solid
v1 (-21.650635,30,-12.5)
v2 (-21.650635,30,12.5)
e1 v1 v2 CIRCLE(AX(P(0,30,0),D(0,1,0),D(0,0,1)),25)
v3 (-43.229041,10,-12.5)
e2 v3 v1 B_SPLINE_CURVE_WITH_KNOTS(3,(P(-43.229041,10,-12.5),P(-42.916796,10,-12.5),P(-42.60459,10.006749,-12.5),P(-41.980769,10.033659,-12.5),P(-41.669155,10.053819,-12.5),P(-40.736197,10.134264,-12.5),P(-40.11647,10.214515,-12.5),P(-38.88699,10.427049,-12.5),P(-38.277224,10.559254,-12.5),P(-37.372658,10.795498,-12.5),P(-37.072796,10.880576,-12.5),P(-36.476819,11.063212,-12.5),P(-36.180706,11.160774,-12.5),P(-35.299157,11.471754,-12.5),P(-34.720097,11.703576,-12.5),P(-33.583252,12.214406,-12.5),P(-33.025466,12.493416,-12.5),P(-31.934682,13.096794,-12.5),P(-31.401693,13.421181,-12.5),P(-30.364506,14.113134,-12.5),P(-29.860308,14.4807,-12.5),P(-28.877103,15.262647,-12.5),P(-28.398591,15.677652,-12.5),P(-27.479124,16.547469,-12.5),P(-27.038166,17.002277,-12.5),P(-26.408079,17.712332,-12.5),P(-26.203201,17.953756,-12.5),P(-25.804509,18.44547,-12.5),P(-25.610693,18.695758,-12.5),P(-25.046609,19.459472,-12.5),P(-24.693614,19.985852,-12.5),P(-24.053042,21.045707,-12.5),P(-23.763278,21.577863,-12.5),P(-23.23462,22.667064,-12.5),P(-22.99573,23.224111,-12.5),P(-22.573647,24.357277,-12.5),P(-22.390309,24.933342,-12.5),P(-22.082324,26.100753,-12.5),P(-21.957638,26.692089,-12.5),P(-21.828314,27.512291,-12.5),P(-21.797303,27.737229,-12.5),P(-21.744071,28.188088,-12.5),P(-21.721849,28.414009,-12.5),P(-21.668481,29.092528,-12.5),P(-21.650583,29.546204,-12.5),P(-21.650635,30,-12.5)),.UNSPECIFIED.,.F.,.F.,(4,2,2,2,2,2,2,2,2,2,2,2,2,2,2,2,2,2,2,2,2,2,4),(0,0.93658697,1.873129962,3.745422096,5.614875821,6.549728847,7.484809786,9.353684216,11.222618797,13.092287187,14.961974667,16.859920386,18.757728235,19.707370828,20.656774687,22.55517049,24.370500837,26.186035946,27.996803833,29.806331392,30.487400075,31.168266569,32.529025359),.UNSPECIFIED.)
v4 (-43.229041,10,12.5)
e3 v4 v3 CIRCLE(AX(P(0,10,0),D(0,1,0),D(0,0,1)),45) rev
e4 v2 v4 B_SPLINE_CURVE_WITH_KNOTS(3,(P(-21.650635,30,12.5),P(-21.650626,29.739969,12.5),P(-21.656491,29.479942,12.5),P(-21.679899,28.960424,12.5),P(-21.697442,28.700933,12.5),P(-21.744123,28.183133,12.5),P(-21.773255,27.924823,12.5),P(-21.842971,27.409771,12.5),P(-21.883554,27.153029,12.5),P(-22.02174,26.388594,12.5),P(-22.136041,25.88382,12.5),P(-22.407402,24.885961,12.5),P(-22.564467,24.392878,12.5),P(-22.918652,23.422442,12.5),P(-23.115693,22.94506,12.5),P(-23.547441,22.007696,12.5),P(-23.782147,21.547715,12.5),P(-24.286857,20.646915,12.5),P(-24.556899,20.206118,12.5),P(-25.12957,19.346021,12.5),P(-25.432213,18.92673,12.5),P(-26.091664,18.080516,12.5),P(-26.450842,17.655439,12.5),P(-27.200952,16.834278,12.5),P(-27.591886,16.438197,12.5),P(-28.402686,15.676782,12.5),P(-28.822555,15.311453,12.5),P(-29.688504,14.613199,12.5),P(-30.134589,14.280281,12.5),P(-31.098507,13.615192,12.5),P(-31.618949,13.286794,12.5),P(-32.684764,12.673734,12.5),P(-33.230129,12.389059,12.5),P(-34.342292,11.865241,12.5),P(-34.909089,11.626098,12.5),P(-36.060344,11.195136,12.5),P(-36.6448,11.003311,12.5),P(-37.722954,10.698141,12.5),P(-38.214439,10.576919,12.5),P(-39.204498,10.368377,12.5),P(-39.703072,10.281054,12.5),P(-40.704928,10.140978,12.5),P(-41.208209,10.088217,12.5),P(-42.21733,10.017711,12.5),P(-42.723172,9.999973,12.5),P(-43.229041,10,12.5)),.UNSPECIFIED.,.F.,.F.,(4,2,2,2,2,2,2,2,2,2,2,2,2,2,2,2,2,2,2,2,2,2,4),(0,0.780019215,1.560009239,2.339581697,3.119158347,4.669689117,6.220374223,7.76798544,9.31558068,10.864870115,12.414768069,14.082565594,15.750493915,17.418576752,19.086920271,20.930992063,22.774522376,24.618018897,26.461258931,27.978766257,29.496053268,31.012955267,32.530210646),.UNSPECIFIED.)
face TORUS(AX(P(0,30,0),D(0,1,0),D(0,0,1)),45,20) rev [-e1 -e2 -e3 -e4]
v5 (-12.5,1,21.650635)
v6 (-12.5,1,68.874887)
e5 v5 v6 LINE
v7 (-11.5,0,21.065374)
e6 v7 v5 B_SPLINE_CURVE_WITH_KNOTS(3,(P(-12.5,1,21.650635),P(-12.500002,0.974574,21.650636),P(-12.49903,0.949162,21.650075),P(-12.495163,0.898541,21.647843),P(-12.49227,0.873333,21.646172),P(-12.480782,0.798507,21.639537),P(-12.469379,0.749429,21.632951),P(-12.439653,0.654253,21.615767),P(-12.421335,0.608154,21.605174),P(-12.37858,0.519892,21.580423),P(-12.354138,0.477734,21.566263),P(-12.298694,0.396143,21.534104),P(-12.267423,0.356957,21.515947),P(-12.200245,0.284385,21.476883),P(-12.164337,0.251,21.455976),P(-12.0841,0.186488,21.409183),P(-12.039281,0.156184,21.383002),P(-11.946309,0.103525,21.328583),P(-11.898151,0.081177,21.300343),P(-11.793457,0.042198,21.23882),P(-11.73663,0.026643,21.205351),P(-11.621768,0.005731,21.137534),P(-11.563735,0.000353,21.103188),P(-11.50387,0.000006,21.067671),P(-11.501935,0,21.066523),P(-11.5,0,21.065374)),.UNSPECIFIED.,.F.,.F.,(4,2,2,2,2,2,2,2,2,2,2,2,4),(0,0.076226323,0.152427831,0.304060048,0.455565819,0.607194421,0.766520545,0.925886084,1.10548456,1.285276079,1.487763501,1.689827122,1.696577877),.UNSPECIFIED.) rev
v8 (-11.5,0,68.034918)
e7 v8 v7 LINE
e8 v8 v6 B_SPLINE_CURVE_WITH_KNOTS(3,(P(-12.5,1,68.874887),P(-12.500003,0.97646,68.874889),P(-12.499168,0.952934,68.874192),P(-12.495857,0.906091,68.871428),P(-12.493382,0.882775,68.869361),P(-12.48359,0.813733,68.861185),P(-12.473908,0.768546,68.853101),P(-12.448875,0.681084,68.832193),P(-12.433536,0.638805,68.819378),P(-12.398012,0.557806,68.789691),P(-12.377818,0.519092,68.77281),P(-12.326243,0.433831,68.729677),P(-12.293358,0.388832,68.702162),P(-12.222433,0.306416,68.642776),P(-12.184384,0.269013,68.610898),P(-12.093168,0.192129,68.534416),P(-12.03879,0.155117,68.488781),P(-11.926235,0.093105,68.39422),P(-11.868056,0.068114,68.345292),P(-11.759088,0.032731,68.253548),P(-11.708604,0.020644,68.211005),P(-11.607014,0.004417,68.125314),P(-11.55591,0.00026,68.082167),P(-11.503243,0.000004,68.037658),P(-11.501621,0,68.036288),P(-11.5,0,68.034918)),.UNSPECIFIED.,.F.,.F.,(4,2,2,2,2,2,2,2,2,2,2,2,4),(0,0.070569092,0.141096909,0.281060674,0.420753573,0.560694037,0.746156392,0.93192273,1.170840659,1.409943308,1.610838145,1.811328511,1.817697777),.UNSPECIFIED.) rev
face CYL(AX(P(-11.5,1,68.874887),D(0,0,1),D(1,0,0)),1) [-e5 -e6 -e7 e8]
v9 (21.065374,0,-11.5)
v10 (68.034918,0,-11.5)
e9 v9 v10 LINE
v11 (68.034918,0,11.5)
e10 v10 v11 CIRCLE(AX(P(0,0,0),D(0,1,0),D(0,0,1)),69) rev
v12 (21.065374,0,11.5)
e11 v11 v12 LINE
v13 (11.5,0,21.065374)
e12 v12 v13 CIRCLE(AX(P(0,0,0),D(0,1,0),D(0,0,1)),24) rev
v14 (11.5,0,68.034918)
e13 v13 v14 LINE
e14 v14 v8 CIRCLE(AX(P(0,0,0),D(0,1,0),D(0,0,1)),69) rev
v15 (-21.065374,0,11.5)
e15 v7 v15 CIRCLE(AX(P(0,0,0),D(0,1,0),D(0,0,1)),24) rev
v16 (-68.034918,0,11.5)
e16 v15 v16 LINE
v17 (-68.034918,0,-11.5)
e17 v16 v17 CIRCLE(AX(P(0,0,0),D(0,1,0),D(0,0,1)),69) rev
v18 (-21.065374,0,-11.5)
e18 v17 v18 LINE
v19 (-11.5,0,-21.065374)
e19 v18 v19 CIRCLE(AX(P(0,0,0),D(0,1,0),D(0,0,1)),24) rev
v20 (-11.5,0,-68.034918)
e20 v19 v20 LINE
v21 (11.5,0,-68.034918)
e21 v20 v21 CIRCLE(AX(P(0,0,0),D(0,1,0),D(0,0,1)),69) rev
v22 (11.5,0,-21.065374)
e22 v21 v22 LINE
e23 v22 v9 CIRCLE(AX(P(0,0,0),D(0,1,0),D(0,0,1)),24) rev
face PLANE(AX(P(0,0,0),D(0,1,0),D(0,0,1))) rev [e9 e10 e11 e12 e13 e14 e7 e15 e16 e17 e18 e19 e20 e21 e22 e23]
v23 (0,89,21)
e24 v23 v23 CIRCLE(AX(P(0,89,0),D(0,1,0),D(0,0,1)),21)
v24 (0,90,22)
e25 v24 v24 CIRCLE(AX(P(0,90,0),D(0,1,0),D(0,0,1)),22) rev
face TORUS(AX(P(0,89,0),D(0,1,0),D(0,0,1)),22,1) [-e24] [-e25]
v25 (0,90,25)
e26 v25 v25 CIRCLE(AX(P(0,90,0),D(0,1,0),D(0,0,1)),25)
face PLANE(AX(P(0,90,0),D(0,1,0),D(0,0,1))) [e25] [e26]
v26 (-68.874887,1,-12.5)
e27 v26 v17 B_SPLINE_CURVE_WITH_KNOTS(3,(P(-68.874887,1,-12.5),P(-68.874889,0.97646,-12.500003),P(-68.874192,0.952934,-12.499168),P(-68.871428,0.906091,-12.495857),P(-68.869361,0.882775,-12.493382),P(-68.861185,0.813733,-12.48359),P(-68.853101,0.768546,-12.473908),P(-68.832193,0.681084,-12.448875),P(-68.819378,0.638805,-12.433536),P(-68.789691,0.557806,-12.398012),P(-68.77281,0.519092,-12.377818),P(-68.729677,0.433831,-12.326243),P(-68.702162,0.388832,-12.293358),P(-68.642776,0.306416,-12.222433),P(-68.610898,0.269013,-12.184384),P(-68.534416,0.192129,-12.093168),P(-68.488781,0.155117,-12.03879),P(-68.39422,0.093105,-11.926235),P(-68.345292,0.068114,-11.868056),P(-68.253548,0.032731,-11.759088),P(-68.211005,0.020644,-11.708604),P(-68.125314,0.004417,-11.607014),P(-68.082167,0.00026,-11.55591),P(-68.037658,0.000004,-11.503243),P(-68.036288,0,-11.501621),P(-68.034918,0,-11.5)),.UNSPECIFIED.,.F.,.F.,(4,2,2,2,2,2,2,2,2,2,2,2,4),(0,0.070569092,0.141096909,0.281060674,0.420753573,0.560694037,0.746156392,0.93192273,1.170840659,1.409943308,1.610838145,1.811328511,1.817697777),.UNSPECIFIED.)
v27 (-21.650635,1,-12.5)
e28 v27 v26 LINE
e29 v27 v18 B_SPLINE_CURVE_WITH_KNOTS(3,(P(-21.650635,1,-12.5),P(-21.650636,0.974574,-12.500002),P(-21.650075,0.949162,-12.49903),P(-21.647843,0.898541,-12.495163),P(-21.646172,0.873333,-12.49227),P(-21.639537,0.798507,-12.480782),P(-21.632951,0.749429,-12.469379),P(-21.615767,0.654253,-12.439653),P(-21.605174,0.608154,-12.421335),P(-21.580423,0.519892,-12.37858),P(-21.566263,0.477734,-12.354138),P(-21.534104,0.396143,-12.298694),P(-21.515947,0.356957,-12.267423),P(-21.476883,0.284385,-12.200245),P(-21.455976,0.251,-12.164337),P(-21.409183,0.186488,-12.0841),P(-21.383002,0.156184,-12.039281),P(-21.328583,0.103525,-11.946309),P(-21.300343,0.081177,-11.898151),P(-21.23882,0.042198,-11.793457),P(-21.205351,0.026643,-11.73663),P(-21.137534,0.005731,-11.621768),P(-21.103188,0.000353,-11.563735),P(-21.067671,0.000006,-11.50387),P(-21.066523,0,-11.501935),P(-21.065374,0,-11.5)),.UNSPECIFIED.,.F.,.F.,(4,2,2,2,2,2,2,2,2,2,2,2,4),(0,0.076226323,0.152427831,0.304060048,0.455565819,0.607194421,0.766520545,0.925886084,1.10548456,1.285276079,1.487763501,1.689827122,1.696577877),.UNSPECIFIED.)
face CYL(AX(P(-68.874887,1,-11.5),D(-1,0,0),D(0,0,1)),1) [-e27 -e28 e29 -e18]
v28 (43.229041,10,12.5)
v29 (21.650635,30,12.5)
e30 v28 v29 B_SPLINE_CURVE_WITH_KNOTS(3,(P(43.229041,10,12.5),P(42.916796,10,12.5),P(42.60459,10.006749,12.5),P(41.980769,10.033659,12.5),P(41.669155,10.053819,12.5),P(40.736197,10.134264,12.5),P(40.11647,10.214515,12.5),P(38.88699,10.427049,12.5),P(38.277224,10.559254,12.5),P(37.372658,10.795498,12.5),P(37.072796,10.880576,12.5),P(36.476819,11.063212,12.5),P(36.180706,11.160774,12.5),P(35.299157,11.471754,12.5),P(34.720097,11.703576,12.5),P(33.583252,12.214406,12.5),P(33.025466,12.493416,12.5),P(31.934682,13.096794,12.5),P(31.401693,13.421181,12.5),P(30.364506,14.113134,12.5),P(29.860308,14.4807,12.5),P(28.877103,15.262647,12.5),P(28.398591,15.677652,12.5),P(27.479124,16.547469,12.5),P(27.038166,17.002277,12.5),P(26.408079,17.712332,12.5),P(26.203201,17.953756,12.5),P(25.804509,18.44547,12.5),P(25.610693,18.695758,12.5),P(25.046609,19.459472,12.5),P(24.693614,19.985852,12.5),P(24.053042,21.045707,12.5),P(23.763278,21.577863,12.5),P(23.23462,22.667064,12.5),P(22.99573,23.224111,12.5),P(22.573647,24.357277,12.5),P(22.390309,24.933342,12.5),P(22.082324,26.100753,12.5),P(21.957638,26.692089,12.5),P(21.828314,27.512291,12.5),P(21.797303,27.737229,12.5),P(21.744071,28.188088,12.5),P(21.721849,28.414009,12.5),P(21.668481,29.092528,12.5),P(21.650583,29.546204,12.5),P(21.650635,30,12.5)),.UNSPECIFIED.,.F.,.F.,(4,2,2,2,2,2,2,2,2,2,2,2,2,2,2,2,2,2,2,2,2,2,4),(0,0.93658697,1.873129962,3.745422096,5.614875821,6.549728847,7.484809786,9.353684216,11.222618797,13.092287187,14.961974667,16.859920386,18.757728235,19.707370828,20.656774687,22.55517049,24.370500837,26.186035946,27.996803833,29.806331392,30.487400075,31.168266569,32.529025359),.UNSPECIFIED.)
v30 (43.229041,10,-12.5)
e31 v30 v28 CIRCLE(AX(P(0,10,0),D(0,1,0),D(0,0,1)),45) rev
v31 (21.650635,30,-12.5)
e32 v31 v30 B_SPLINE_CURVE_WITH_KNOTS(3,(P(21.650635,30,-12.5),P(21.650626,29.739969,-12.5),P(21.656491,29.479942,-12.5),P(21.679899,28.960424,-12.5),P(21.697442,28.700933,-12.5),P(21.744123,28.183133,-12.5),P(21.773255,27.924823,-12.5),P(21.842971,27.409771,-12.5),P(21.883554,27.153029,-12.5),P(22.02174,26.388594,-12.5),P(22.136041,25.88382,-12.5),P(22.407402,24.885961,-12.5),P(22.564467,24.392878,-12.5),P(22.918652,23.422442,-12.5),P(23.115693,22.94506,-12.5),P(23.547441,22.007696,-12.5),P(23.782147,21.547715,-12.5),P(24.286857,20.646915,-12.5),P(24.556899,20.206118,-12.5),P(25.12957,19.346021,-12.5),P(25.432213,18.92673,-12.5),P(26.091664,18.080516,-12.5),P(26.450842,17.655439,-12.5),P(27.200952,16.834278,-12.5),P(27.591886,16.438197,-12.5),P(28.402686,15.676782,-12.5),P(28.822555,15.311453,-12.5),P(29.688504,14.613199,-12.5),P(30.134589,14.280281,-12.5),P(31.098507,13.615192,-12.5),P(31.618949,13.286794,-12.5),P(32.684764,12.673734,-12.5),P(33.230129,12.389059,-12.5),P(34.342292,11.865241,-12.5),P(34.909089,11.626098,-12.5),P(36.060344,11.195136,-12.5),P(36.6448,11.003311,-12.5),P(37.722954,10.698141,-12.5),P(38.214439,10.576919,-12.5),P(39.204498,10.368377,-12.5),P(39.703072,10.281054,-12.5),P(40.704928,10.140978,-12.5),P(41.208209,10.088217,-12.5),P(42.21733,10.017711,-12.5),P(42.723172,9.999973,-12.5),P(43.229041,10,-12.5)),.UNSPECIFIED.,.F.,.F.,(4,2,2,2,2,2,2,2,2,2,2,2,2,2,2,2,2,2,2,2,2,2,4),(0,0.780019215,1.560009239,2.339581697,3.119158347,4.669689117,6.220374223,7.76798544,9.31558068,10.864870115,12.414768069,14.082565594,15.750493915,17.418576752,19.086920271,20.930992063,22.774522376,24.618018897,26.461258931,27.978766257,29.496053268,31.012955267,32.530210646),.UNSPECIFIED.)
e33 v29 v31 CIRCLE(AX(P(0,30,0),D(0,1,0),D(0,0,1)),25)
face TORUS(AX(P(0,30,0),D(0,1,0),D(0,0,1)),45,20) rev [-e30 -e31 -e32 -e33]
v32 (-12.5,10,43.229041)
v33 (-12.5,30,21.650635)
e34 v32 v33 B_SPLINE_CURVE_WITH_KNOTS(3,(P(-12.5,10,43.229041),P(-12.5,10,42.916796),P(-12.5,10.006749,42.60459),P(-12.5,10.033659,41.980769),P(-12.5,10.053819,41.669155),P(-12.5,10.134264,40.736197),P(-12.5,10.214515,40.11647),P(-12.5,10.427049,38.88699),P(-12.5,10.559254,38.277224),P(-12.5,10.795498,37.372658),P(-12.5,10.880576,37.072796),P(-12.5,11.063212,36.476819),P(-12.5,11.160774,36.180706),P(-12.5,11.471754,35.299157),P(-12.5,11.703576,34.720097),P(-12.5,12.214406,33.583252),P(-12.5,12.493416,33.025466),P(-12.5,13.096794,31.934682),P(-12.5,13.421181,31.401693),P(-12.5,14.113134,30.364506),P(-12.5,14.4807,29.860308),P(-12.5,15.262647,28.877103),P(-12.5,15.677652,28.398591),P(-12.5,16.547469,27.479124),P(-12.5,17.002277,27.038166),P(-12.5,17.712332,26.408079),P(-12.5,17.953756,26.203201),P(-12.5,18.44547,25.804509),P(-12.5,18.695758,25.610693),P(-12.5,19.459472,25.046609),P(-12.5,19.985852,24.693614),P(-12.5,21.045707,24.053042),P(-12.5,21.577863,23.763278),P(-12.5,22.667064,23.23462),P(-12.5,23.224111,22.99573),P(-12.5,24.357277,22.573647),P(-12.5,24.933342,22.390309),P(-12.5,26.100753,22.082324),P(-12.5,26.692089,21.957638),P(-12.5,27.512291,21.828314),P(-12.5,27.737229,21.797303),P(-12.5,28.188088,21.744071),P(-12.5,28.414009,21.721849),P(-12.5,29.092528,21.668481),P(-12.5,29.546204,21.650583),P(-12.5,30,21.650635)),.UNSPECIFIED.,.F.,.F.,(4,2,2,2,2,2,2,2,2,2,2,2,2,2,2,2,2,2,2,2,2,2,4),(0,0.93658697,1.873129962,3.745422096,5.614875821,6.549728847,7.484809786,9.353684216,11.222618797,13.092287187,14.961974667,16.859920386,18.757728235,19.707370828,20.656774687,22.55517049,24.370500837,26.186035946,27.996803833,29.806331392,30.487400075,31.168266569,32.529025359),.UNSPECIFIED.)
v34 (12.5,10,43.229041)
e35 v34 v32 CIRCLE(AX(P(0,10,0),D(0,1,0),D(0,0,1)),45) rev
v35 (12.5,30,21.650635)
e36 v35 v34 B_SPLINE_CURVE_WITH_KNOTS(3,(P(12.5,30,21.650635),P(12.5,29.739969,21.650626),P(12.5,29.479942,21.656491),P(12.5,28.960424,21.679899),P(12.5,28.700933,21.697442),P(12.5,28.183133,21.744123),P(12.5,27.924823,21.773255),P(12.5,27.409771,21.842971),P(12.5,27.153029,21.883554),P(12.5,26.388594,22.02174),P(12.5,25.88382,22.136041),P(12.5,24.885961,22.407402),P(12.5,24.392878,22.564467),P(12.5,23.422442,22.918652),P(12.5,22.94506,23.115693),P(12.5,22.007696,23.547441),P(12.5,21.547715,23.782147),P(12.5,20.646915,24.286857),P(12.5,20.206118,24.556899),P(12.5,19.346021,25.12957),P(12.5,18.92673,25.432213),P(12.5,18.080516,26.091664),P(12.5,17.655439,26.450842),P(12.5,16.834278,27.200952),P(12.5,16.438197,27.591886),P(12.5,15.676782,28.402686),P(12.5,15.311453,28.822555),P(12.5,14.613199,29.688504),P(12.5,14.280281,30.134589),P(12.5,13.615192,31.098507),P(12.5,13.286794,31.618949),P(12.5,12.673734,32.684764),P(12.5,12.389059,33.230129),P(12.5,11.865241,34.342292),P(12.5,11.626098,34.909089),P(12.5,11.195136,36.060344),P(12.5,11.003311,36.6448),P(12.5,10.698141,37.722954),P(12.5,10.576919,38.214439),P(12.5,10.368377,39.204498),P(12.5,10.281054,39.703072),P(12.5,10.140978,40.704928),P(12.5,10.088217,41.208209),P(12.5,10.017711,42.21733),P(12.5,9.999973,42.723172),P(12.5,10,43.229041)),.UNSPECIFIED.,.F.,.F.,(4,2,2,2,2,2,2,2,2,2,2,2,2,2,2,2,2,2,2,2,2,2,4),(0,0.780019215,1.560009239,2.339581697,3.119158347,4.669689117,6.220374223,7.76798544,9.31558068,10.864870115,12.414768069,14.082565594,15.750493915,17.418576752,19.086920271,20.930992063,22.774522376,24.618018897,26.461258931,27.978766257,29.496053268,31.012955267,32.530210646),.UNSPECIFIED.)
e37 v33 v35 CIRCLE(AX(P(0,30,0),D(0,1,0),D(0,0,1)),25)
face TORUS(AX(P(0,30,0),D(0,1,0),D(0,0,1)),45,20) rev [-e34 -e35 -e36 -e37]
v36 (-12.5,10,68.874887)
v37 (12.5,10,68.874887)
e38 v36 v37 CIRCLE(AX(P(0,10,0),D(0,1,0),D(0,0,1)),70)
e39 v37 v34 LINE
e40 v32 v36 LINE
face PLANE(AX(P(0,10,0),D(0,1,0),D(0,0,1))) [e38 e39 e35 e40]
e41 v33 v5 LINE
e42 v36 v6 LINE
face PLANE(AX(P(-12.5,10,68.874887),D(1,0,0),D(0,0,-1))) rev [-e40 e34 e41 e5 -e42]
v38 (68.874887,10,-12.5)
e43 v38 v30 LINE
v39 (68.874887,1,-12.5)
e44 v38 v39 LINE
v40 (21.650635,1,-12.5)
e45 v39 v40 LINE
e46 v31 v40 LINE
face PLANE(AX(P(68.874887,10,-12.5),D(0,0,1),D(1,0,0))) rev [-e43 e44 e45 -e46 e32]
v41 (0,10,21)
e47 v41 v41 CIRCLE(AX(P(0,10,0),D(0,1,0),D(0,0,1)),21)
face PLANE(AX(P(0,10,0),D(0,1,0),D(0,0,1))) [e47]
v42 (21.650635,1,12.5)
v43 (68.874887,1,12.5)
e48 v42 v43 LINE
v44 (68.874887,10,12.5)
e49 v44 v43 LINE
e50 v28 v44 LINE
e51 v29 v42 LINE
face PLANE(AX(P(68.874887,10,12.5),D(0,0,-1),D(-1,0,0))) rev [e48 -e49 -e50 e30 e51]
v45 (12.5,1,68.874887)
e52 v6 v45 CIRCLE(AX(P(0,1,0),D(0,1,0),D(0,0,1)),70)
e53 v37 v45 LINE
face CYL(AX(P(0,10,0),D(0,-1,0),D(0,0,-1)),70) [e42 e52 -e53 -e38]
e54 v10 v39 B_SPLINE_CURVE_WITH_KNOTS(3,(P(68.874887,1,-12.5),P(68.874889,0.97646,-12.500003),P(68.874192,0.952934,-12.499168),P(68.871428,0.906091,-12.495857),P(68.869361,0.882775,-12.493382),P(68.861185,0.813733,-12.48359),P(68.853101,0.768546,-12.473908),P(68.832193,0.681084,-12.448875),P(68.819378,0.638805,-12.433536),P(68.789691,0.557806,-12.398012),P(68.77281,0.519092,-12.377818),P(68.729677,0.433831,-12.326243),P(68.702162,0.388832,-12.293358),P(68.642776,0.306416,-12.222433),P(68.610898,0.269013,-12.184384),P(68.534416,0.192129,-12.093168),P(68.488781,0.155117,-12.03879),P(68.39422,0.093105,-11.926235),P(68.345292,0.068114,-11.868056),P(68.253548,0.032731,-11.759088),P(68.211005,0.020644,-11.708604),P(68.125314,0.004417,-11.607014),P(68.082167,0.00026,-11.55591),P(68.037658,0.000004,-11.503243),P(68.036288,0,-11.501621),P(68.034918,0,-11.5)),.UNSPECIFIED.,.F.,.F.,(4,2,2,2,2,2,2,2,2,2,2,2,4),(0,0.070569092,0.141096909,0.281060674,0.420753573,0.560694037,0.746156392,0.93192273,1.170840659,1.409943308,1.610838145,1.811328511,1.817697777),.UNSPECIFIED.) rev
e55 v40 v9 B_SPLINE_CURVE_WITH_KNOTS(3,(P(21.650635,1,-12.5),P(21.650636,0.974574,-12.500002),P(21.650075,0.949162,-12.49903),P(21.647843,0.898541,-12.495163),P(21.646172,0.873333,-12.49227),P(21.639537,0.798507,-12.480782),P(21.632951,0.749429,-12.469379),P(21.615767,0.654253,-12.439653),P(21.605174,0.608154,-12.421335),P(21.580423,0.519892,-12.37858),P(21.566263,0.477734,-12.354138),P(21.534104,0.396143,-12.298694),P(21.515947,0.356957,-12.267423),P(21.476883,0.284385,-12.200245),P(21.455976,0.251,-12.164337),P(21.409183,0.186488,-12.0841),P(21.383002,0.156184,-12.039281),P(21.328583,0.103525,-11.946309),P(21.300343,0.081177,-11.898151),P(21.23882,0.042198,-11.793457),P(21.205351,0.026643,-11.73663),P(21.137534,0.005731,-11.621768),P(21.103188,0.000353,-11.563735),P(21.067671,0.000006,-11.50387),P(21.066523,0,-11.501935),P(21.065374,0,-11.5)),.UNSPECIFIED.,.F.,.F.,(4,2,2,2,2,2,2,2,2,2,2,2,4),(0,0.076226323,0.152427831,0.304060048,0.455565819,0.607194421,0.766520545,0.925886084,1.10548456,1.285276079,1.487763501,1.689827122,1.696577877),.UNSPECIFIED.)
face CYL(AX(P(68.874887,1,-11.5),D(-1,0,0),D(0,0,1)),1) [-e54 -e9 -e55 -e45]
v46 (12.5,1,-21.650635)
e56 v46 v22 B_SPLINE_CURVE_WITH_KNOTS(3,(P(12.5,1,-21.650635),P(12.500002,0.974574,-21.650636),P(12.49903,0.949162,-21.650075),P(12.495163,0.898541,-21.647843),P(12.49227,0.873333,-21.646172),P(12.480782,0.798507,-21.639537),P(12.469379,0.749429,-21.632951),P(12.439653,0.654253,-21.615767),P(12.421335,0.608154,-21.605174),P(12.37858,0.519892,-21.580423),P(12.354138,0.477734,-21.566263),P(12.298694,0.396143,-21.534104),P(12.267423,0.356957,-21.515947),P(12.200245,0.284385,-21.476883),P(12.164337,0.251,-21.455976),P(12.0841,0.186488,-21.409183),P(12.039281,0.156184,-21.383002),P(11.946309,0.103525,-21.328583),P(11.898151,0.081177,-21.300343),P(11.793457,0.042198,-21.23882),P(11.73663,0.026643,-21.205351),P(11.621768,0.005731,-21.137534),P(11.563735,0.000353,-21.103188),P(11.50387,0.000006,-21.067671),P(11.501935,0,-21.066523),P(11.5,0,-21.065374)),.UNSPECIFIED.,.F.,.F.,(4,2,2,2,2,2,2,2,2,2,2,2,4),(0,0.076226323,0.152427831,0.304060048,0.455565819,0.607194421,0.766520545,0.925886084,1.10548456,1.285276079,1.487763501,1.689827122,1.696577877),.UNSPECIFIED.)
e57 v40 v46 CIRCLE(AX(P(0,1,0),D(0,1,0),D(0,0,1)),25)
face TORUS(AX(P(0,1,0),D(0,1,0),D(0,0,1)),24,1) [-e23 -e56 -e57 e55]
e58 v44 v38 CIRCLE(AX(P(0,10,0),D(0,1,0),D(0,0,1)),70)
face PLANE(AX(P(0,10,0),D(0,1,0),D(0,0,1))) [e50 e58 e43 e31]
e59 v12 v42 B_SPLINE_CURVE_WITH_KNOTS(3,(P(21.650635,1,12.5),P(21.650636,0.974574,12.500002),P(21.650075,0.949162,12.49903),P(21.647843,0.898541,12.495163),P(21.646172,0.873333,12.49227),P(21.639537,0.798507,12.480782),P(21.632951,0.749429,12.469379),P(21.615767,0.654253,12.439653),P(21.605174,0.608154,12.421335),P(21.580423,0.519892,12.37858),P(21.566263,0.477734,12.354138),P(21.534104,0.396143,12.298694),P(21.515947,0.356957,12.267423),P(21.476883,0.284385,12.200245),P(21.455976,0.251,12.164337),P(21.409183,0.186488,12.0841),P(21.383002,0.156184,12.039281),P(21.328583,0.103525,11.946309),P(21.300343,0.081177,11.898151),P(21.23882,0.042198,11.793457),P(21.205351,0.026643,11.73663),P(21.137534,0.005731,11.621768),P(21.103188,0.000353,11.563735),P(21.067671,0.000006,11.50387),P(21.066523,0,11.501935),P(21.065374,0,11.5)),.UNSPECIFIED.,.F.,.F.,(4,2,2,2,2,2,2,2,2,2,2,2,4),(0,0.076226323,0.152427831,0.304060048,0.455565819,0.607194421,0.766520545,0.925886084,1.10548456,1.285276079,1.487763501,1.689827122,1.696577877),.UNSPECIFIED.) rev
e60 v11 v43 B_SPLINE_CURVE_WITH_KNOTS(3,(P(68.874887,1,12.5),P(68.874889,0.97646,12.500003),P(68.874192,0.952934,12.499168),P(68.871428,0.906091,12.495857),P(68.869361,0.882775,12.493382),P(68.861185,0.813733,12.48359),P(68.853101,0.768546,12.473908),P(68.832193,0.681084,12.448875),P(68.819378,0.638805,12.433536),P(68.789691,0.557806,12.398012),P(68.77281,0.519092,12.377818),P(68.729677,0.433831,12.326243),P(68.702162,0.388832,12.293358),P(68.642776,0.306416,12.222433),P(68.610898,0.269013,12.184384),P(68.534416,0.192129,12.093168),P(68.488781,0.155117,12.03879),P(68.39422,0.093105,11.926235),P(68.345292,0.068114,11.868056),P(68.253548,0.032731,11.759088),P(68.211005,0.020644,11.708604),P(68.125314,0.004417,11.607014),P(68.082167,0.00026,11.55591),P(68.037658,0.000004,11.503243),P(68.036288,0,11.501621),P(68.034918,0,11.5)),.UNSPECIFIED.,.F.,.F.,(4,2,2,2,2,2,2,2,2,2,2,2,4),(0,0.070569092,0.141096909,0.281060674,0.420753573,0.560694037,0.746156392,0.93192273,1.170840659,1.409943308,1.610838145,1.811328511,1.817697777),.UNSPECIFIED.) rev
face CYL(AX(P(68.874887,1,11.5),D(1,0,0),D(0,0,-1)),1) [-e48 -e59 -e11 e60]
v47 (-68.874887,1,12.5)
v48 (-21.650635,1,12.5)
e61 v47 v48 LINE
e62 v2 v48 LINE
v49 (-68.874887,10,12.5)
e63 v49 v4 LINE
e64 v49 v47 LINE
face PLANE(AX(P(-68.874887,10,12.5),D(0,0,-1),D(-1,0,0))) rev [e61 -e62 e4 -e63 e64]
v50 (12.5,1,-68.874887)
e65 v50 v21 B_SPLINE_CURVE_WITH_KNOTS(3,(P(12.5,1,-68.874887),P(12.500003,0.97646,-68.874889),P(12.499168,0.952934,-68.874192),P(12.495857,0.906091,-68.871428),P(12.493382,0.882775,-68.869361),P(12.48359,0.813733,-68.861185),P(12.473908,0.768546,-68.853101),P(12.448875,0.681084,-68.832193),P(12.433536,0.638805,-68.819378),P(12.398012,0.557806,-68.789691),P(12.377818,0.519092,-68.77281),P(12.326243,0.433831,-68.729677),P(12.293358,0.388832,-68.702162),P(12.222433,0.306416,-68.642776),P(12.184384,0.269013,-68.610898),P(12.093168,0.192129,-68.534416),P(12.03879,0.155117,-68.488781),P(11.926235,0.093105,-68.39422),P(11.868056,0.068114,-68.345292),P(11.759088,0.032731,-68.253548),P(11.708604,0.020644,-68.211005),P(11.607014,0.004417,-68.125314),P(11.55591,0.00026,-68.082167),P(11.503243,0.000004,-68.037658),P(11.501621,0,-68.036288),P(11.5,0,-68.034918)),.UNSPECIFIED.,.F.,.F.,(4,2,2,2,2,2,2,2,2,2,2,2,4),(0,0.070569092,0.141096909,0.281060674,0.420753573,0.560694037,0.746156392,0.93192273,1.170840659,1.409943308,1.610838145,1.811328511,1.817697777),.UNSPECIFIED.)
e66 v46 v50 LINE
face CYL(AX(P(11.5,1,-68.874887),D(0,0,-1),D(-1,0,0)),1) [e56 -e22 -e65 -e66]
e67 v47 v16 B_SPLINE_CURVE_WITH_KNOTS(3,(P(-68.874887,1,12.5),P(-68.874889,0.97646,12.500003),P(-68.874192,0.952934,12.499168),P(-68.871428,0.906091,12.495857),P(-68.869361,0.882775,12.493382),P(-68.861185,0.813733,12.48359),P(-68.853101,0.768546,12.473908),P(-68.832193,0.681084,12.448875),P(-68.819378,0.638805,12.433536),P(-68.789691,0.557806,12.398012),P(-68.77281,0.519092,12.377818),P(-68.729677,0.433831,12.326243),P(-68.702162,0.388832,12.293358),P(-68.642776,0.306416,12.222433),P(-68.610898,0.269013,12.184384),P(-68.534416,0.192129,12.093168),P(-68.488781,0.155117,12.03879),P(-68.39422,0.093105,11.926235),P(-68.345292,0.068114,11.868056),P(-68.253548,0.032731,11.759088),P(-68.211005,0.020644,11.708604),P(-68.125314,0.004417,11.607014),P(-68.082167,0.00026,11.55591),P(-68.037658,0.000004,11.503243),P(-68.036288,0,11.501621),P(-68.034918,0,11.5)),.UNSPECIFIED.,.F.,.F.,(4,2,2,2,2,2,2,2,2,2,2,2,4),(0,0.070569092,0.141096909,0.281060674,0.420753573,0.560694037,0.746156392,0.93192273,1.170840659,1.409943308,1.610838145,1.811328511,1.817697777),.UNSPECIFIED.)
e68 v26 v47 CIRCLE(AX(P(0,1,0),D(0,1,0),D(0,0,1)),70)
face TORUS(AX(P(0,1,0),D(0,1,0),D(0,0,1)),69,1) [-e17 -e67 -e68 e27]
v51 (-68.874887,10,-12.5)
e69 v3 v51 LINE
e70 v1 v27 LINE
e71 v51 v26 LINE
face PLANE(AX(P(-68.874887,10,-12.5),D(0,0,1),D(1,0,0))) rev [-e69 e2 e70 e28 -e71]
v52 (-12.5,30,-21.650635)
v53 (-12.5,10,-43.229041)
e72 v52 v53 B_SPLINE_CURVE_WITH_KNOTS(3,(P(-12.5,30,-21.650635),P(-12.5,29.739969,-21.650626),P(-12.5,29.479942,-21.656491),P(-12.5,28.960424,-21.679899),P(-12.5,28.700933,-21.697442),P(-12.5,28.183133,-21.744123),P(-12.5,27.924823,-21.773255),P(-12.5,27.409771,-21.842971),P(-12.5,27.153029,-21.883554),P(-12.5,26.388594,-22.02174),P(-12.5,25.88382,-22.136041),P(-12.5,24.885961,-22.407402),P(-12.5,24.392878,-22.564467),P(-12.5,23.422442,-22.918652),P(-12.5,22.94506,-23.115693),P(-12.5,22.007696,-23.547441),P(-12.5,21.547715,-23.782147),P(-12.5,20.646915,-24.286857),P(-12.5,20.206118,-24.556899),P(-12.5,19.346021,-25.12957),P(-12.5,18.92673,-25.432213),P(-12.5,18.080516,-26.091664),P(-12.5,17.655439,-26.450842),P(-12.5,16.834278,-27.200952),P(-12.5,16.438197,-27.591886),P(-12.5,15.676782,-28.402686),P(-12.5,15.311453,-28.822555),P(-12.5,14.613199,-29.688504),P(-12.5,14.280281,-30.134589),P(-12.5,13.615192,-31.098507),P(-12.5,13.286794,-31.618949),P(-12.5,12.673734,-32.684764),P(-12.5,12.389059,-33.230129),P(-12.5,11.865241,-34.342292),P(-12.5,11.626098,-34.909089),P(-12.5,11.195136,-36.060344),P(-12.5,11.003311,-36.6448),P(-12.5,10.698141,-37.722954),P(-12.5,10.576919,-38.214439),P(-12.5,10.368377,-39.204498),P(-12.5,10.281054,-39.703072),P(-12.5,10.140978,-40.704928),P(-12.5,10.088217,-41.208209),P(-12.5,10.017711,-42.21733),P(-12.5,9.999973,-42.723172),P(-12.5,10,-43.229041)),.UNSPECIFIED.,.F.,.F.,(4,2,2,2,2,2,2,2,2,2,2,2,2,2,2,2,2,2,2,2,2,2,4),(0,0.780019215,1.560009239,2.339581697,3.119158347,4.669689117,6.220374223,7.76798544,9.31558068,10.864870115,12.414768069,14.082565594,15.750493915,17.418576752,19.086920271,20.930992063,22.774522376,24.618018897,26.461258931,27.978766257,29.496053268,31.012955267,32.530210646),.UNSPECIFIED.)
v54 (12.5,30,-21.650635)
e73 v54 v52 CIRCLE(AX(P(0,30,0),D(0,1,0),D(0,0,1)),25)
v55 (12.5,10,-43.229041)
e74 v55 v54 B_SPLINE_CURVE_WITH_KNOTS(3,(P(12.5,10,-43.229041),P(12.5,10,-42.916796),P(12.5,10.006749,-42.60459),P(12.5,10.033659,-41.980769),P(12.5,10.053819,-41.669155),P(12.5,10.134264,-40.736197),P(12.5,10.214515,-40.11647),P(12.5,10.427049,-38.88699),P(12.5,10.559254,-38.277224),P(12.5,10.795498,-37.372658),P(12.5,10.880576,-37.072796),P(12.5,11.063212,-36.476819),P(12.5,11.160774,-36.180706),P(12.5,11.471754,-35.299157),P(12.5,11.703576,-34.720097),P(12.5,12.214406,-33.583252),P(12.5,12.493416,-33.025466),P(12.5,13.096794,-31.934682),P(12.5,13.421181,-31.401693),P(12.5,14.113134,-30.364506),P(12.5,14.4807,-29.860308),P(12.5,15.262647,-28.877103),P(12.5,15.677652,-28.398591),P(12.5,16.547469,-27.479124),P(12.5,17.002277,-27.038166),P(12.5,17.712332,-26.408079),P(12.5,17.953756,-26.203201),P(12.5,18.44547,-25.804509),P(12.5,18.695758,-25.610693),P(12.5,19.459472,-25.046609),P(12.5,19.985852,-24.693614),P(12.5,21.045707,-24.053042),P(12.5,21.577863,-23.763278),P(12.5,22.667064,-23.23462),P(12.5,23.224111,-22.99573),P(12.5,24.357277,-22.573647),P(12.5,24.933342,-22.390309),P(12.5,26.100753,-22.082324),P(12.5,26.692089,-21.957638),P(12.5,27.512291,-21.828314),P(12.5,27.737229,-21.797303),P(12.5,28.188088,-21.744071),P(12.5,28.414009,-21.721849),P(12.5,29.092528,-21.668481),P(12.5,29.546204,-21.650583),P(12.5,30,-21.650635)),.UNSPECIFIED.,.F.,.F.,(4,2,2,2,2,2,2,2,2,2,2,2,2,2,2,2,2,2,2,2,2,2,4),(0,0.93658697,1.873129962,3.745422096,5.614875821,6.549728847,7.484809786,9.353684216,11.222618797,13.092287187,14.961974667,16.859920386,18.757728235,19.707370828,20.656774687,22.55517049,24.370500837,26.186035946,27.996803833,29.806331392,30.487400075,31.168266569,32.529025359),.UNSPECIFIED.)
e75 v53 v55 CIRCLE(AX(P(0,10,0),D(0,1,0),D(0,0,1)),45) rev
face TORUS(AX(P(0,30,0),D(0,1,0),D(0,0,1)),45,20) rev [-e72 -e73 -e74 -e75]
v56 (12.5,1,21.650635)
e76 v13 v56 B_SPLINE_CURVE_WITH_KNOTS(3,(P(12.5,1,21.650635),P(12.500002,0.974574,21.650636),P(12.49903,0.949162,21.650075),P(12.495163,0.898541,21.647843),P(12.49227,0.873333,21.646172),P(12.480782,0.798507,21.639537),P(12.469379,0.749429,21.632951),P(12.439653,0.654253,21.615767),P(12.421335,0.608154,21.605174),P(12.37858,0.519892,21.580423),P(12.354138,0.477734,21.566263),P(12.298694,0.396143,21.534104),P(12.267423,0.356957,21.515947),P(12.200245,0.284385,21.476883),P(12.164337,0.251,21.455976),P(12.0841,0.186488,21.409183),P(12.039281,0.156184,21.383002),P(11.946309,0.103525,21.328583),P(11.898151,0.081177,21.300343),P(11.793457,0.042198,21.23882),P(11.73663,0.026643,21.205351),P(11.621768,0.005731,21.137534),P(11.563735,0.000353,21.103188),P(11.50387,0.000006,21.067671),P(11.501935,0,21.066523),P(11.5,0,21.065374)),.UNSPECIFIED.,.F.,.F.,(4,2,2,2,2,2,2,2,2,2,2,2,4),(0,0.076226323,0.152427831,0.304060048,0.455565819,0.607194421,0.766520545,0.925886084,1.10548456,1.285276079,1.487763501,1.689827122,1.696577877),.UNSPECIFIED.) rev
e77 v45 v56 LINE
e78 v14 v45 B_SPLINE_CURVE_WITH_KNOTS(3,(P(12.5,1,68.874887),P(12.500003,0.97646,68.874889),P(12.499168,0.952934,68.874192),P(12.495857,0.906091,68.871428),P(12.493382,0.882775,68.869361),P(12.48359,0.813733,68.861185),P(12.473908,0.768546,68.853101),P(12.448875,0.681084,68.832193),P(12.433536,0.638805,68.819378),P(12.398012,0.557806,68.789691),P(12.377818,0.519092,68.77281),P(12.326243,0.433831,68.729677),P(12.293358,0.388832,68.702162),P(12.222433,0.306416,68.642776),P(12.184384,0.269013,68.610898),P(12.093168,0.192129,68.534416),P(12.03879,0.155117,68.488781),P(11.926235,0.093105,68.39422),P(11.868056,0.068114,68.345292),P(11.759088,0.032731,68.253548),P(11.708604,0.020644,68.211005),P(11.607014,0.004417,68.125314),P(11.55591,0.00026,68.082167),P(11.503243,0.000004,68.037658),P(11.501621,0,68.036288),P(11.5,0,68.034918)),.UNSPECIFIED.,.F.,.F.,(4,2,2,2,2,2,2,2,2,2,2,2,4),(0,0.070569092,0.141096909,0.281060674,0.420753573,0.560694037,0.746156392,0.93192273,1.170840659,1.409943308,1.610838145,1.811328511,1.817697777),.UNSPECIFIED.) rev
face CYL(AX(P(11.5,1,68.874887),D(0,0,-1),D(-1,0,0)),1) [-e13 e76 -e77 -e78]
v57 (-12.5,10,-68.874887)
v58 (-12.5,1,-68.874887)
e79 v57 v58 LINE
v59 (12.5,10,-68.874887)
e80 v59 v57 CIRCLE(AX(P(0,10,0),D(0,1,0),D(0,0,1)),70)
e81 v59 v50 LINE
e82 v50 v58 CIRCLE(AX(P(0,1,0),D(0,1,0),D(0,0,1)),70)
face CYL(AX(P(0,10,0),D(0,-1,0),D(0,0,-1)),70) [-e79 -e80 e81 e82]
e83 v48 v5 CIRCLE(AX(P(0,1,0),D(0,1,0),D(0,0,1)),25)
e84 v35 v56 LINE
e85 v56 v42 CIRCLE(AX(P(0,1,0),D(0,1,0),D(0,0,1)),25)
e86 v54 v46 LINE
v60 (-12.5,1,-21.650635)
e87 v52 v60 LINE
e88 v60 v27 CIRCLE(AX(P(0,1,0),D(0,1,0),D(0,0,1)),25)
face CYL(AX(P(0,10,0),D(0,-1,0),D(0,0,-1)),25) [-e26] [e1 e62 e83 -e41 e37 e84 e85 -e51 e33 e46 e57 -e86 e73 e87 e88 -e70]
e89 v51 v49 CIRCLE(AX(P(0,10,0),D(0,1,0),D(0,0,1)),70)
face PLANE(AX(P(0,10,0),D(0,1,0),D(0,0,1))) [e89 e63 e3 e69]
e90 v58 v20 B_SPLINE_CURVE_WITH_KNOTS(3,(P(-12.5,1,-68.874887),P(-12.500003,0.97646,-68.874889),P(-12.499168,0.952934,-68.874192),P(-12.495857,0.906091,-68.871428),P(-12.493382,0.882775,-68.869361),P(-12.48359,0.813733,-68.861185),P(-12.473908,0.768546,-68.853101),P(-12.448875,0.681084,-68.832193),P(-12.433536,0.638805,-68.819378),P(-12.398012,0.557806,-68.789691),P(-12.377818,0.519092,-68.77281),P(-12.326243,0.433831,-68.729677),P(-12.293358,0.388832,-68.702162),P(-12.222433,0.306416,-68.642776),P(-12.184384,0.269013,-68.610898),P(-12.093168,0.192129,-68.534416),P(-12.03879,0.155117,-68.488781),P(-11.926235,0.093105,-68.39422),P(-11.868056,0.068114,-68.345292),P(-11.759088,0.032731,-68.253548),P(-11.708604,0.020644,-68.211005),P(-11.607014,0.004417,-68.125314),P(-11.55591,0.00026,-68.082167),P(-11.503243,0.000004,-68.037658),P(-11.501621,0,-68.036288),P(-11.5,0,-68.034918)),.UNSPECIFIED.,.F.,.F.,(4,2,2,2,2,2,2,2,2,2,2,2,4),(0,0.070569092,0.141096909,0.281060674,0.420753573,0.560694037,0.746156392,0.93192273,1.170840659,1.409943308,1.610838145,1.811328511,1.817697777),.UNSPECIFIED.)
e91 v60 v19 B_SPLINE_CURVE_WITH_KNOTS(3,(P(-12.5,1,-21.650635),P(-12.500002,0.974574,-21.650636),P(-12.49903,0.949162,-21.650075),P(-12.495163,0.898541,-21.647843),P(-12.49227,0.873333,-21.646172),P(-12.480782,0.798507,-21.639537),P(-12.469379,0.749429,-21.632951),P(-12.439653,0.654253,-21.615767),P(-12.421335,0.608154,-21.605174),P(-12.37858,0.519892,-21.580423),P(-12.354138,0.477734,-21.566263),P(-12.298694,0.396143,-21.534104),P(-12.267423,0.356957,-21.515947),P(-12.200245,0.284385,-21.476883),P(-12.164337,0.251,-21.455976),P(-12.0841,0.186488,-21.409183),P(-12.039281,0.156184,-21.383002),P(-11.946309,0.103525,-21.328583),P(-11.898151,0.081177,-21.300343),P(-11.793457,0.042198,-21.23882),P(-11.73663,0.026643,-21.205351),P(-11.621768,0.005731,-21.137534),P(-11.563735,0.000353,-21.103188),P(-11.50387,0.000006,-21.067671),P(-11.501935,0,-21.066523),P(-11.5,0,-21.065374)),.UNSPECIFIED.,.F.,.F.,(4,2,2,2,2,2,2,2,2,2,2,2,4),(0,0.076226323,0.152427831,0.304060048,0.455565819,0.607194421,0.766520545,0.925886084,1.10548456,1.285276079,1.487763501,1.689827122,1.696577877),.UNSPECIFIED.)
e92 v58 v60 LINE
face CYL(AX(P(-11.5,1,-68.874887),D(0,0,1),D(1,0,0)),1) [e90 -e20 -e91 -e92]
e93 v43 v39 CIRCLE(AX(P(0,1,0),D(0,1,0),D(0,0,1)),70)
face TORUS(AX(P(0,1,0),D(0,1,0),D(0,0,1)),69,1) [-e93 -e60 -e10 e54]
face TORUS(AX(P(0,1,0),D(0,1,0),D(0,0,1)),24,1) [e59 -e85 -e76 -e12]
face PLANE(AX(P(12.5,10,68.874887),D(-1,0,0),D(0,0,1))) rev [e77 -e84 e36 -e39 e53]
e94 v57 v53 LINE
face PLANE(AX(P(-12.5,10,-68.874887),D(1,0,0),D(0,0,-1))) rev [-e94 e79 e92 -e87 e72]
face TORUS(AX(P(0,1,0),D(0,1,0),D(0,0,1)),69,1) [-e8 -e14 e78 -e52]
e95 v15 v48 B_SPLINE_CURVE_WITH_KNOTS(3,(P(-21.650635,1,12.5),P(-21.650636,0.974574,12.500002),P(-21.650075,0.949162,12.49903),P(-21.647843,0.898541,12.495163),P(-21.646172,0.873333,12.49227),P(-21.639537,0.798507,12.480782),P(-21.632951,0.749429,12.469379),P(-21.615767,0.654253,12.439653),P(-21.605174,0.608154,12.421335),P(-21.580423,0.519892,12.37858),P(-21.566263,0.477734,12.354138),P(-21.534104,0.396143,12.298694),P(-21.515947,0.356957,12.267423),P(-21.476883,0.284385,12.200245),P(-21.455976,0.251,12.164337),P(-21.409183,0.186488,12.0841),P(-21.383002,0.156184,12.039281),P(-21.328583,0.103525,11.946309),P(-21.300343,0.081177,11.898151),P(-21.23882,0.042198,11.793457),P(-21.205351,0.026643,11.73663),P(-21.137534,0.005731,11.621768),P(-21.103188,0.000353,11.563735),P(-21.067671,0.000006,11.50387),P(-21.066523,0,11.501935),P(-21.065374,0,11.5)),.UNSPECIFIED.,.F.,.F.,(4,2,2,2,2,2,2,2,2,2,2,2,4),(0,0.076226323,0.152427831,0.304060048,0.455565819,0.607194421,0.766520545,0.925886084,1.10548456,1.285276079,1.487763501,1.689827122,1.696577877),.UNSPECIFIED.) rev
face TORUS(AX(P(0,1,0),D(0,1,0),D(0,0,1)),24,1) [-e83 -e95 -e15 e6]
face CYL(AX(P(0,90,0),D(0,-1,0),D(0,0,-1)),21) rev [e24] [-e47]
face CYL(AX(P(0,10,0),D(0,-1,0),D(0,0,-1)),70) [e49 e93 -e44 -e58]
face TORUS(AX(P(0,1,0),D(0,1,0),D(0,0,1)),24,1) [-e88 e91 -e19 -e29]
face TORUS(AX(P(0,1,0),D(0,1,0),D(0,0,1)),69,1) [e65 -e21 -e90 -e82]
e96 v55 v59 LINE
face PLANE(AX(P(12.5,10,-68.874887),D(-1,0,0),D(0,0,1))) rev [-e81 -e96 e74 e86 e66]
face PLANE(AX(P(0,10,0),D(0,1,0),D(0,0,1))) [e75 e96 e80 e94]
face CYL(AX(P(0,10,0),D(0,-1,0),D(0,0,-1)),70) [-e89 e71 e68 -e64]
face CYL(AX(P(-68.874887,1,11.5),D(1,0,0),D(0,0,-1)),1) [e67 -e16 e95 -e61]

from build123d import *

# Parameters (mm, degrees)
BOSS_EXTRUDE1_DEPTH = 10
SKETCH2_R           = 25
SKETCH2_R_2         = 21
BOSS_EXTRUDE2_DEPTH = 80
FILLET1_R           = 1
FILLET2_R           = 20


with BuildPart() as part:
    # Sketch1 → Boss-Extrude1 (new body)
    with BuildSketch(Plane(origin=(0, 0, 0), x_dir=(1, 0, 0), z_dir=(0, 1, 0))):
        with BuildLine():
            Line((-68.87488657, 12.5), (-21.650635095, 12.5))
            ThreePointArc((-21.650635095, 12.5), (-17.67766953, 17.67766953), (-12.5, 21.650635095))
            Line((-12.5, 21.650635095), (-12.5, 68.87488657))
            ThreePointArc((-12.5, 68.87488657), (0, 70), (12.5, 68.87488657))
            Line((12.5, 68.87488657), (12.5, 21.650635095))
            ThreePointArc((12.5, 21.650635095), (17.67766953, 17.67766953), (21.650635095, 12.5))
            Line((21.650635095, 12.5), (68.87488657, 12.5))
            ThreePointArc((68.87488657, 12.5), (70, 0), (68.87488657, -12.5))
            Line((68.87488657, -12.5), (21.650635095, -12.5))
            ThreePointArc((21.650635095, -12.5), (17.67766953, -17.67766953), (12.5, -21.650635095))
            Line((12.5, -21.650635095), (12.5, -68.87488657))
            ThreePointArc((12.5, -68.87488657), (0, -70), (-12.5, -68.87488657))
            Line((-12.5, -68.87488657), (-12.5, -21.650635095))
            ThreePointArc((-12.5, -21.650635095), (-17.67766953, -17.67766953), (-21.650635095, -12.5))
            Line((-21.650635095, -12.5), (-68.87488657, -12.5))
            ThreePointArc((-68.87488657, -12.5), (-70, 0), (-68.87488657, 12.5))
        make_face()
    extrude(amount=BOSS_EXTRUDE1_DEPTH)

    # Sketch2 → Boss-Extrude2 (add)
    with BuildSketch(Plane(origin=(0, 10, 0), x_dir=(1, 0, 0), z_dir=(0, 1, 0))):
        with Locations(Location((0, 0, 0), (0, 0, 120))):
            Circle(SKETCH2_R)
        with Locations(Location((0, 0, 0), (0, 0, 270))):
            Circle(SKETCH2_R_2, mode=Mode.SUBTRACT)
    extrude(amount=BOSS_EXTRUDE2_DEPTH)

    # Fillet1
    fillet1_edges = [part.edges().sort_by_distance(p)[0] for p in [
        (-45.262760832, 0, -12.5),
        (-17.67766953, 0, -17.67766953),
        (-12.5, 0, -45.262760832),
        (0, 0, -70),
        (12.5, 0, -45.262760832),
        (17.67766953, 0, -17.67766953),
        (45.262760832, 0, -12.5),
        (70, 0, 0),
        (45.262760832, 0, 12.5),
        (17.67766953, 0, 17.67766953),
        (12.5, 0, 45.262760832),
        (0, 0, 70),
        (-12.5, 0, 45.262760832),
        (-17.67766953, 0, 17.67766953),
        (-45.262760832, 0, 12.5),
        (-70, 0, 0),
        (0, 90, -21),
    ]]
    fillet(fillet1_edges, radius=FILLET1_R)

    # Fillet2
    # the kernel refuses this fillet: 20 mm, written as the material it adds along each edge
    with BuildSketch(Plane(origin=(0, 10, 0), x_dir=(-0.5791102310921431, 0, -0.8152492503795417), z_dir=(0.8152492503795417, 0, -0.5791102310921431))) as fillet2_piece_1_section:
        with BuildLine():
            CenterArc((25 + FILLET2_R, FILLET2_R), FILLET2_R, 180, 90)
            Line((25 + FILLET2_R, 0), (25, 0))
            Line((25, 0), (25, FILLET2_R))
        make_face()
    fillet2_piece_1 = revolve(axis=Axis((0, 10, 0), (0, 1, 0)), revolution_arc=289.224029318, mode=Mode.PRIVATE)
    fillet2_piece_1 = split(fillet2_piece_1, bisect_by=Plane(origin=(-28.534533207, 14.552524817, -12.5), z_dir=(0, 0, 1)), keep=Keep.TOP, mode=Mode.PRIVATE)
    fillet2_piece_1 = split(fillet2_piece_1, bisect_by=Plane(origin=(-28.534533207, 14.552524817, 12.5), z_dir=(0, 0, -1)), keep=Keep.TOP, mode=Mode.PRIVATE)
    fillet2_piece_1 = split(fillet2_piece_1, bisect_by=Plane(origin=(12.5, 14.552524817, 2.701e-06), z_dir=(-1, 0, 0)), keep=Keep.TOP, mode=Mode.PRIVATE)
    add(fillet2_piece_1)
    with BuildSketch(Plane(origin=(0, 10, 0), x_dir=(-0.5791102310921431, 0, -0.8152492503795417), z_dir=(0.8152492503795417, 0, -0.5791102310921431))) as fillet2_piece_2_section:
        with BuildLine():
            CenterArc((25 + FILLET2_R, FILLET2_R), FILLET2_R, 180, 90)
            Line((25 + FILLET2_R, 0), (25, 0))
            Line((25, 0), (25, FILLET2_R))
        make_face()
    fillet2_piece_2 = revolve(axis=Axis((0, 10, 0), (0, 1, 0)), revolution_arc=289.224029318, mode=Mode.PRIVATE)
    fillet2_piece_2 = split(fillet2_piece_2, bisect_by=Plane(origin=(-12.5, 14.552524817, 28.534533207), z_dir=(1, 0, 0)), keep=Keep.TOP, mode=Mode.PRIVATE)
    fillet2_piece_2 = split(fillet2_piece_2, bisect_by=Plane(origin=(12.5, 14.552524817, 28.534533207), z_dir=(-1, 0, 0)), keep=Keep.TOP, mode=Mode.PRIVATE)
    add(fillet2_piece_2)
    with BuildSketch(Plane(origin=(0, 10, 0), x_dir=(-0.5791102310921431, 0, -0.8152492503795417), z_dir=(0.8152492503795417, 0, -0.5791102310921431))) as fillet2_piece_3_section:
        with BuildLine():
            CenterArc((25 + FILLET2_R, FILLET2_R), FILLET2_R, 180, 90)
            Line((25 + FILLET2_R, 0), (25, 0))
            Line((25, 0), (25, FILLET2_R))
        make_face()
    fillet2_piece_3 = revolve(axis=Axis((0, 10, 0), (0, 1, 0)), revolution_arc=289.224029318, mode=Mode.PRIVATE)
    fillet2_piece_3 = split(fillet2_piece_3, bisect_by=Plane(origin=(28.534533207, 14.552524817, -12.5), z_dir=(0, 0, 1)), keep=Keep.TOP, mode=Mode.PRIVATE)
    fillet2_piece_3 = split(fillet2_piece_3, bisect_by=Plane(origin=(28.534533207, 14.552524817, 12.5), z_dir=(0, 0, -1)), keep=Keep.TOP, mode=Mode.PRIVATE)
    fillet2_piece_3 = split(fillet2_piece_3, bisect_by=Plane(origin=(12.5, 14.552524817, -2.701e-06), z_dir=(1, 0, 0)), keep=Keep.TOP, mode=Mode.PRIVATE)
    add(fillet2_piece_3)
    with BuildSketch(Plane(origin=(0, 10, 0), x_dir=(0.8152492503795357, 0, -0.5791102310921514), z_dir=(0.5791102310921514, 0, 0.8152492503795357))) as fillet2_piece_4_section:
        with BuildLine():
            CenterArc((25 + FILLET2_R, FILLET2_R), FILLET2_R, 180, 90)
            Line((25, FILLET2_R), (25, 0))
            Line((25, 0), (25 + FILLET2_R, 0))
        make_face()
    fillet2_piece_4 = revolve(axis=Axis((0, 10, 0), (0, 1, 0)), revolution_arc=289.224029318, mode=Mode.PRIVATE)
    fillet2_piece_4 = split(fillet2_piece_4, bisect_by=Plane(origin=(-5.76e-07, 14.552525886, 12.5), z_dir=(0, 0, -1)), keep=Keep.TOP, mode=Mode.PRIVATE)
    fillet2_piece_4 = split(fillet2_piece_4, bisect_by=Plane(origin=(-12.5, 14.552525886, -28.534534116), z_dir=(1, 0, 0)), keep=Keep.TOP, mode=Mode.PRIVATE)
    fillet2_piece_4 = split(fillet2_piece_4, bisect_by=Plane(origin=(12.5, 14.552525886, -28.534534116), z_dir=(-1, 0, 0)), keep=Keep.TOP, mode=Mode.PRIVATE)
    add(fillet2_piece_4)
    with BuildSketch(Plane(origin=(0, 10, 0), x_dir=(0.8152492503795357, 0, -0.5791102310921514), z_dir=(0.5791102310921514, 0, 0.8152492503795357))) as fillet2_piece_5_section:
        with BuildLine():
            CenterArc((25 + FILLET2_R, FILLET2_R), FILLET2_R, 180, 90)
            Line((25, FILLET2_R), (25, 0))
            Line((25, 0), (25 + FILLET2_R, 0))
        make_face()
    fillet2_piece_5 = revolve(axis=Axis((0, 10, 0), (0, 1, 0)), revolution_arc=289.224029318, mode=Mode.PRIVATE)
    fillet2_piece_5 = split(fillet2_piece_5, bisect_by=Plane(origin=(-28.534534116, 14.552525886, -12.5), z_dir=(0, 0, 1)), keep=Keep.TOP, mode=Mode.PRIVATE)
    fillet2_piece_5 = split(fillet2_piece_5, bisect_by=Plane(origin=(-28.534534116, 14.552525886, 12.5), z_dir=(0, 0, -1)), keep=Keep.TOP, mode=Mode.PRIVATE)
    add(fillet2_piece_5)
    with BuildSketch(Plane(origin=(0, 10, 0), x_dir=(0.8152492503795357, 0, -0.5791102310921514), z_dir=(0.5791102310921514, 0, 0.8152492503795357))) as fillet2_piece_6_section:
        with BuildLine():
            CenterArc((25 + FILLET2_R, FILLET2_R), FILLET2_R, 180, 90)
            Line((25, FILLET2_R), (25, 0))
            Line((25, 0), (25 + FILLET2_R, 0))
        make_face()
    fillet2_piece_6 = revolve(axis=Axis((0, 10, 0), (0, 1, 0)), revolution_arc=289.224029318, mode=Mode.PRIVATE)
    fillet2_piece_6 = split(fillet2_piece_6, bisect_by=Plane(origin=(5.76e-07, 14.552525886, 12.5), z_dir=(0, 0, 1)), keep=Keep.TOP, mode=Mode.PRIVATE)
    fillet2_piece_6 = split(fillet2_piece_6, bisect_by=Plane(origin=(-12.5, 14.552525886, 28.534534116), z_dir=(1, 0, 0)), keep=Keep.TOP, mode=Mode.PRIVATE)
    fillet2_piece_6 = split(fillet2_piece_6, bisect_by=Plane(origin=(12.5, 14.552525886, 28.534534116), z_dir=(-1, 0, 0)), keep=Keep.TOP, mode=Mode.PRIVATE)
    add(fillet2_piece_6)
    with BuildSketch(Plane(origin=(0, 10, 0), x_dir=(0.5791102310921488, 0, 0.8152492503795377), z_dir=(-0.8152492503795377, 0, 0.5791102310921488))) as fillet2_piece_7_section:
        with BuildLine():
            CenterArc((25 + FILLET2_R, FILLET2_R), FILLET2_R, 180, 90)
            Line((25 + FILLET2_R, 0), (25, 0))
            Line((25, 0), (25, FILLET2_R))
        make_face()
    fillet2_piece_7 = revolve(axis=Axis((0, 10, 0), (0, 1, 0)), revolution_arc=289.224029318, mode=Mode.PRIVATE)
    fillet2_piece_7 = split(fillet2_piece_7, bisect_by=Plane(origin=(28.534533207, 14.552524817, -12.5), z_dir=(0, 0, 1)), keep=Keep.TOP, mode=Mode.PRIVATE)
    fillet2_piece_7 = split(fillet2_piece_7, bisect_by=Plane(origin=(28.534533207, 14.552524817, 12.5), z_dir=(0, 0, -1)), keep=Keep.TOP, mode=Mode.PRIVATE)
    fillet2_piece_7 = split(fillet2_piece_7, bisect_by=Plane(origin=(12.5, 14.552524817, -2.701e-06), z_dir=(1, 0, 0)), keep=Keep.TOP, mode=Mode.PRIVATE)
    add(fillet2_piece_7)
    with BuildSketch(Plane(origin=(0, 10, 0), x_dir=(0.5791102310921488, 0, 0.8152492503795377), z_dir=(-0.8152492503795377, 0, 0.5791102310921488))) as fillet2_piece_8_section:
        with BuildLine():
            CenterArc((25 + FILLET2_R, FILLET2_R), FILLET2_R, 180, 90)
            Line((25 + FILLET2_R, 0), (25, 0))
            Line((25, 0), (25, FILLET2_R))
        make_face()
    fillet2_piece_8 = revolve(axis=Axis((0, 10, 0), (0, 1, 0)), revolution_arc=289.224029318, mode=Mode.PRIVATE)
    fillet2_piece_8 = split(fillet2_piece_8, bisect_by=Plane(origin=(-12.5, 14.552524817, -28.534533207), z_dir=(1, 0, 0)), keep=Keep.TOP, mode=Mode.PRIVATE)
    fillet2_piece_8 = split(fillet2_piece_8, bisect_by=Plane(origin=(12.5, 14.552524817, -28.534533207), z_dir=(-1, 0, 0)), keep=Keep.TOP, mode=Mode.PRIVATE)
    add(fillet2_piece_8)
    with BuildSketch(Plane(origin=(0, 10, 0), x_dir=(0.5791102310921488, 0, 0.8152492503795377), z_dir=(-0.8152492503795377, 0, 0.5791102310921488))) as fillet2_piece_9_section:
        with BuildLine():
            CenterArc((25 + FILLET2_R, FILLET2_R), FILLET2_R, 180, 90)
            Line((25 + FILLET2_R, 0), (25, 0))
            Line((25, 0), (25, FILLET2_R))
        make_face()
    fillet2_piece_9 = revolve(axis=Axis((0, 10, 0), (0, 1, 0)), revolution_arc=289.224029318, mode=Mode.PRIVATE)
    fillet2_piece_9 = split(fillet2_piece_9, bisect_by=Plane(origin=(-28.534533207, 14.552524817, -12.5), z_dir=(0, 0, 1)), keep=Keep.TOP, mode=Mode.PRIVATE)
    fillet2_piece_9 = split(fillet2_piece_9, bisect_by=Plane(origin=(-28.534533207, 14.552524817, 12.5), z_dir=(0, 0, -1)), keep=Keep.TOP, mode=Mode.PRIVATE)
    fillet2_piece_9 = split(fillet2_piece_9, bisect_by=Plane(origin=(12.5, 14.552524817, 2.701e-06), z_dir=(-1, 0, 0)), keep=Keep.TOP, mode=Mode.PRIVATE)
    add(fillet2_piece_9)
    with BuildSketch(Plane(origin=(0, 10, 0), x_dir=(-0.8152492503795393, 0, 0.5791102310921463), z_dir=(-0.5791102310921463, 0, -0.8152492503795393))) as fillet2_piece_10_section:
        with BuildLine():
            CenterArc((25 + FILLET2_R, FILLET2_R), FILLET2_R, 180, 90)
            Line((25 + FILLET2_R, 0), (25, 0))
            Line((25, 0), (25, FILLET2_R))
        make_face()
    fillet2_piece_10 = revolve(axis=Axis((0, 10, 0), (0, 1, 0)), revolution_arc=289.224029318, mode=Mode.PRIVATE)
    fillet2_piece_10 = split(fillet2_piece_10, bisect_by=Plane(origin=(-12.5, 14.552524817, 28.534533207), z_dir=(1, 0, 0)), keep=Keep.TOP, mode=Mode.PRIVATE)
    fillet2_piece_10 = split(fillet2_piece_10, bisect_by=Plane(origin=(2.701e-06, 14.552524817, 12.5), z_dir=(0, 0, 1)), keep=Keep.TOP, mode=Mode.PRIVATE)
    fillet2_piece_10 = split(fillet2_piece_10, bisect_by=Plane(origin=(12.5, 14.552524817, 28.534533207), z_dir=(-1, 0, 0)), keep=Keep.TOP, mode=Mode.PRIVATE)
    add(fillet2_piece_10)
    with BuildSketch(Plane(origin=(0, 10, 0), x_dir=(-0.8152492503795393, 0, 0.5791102310921463), z_dir=(-0.5791102310921463, 0, -0.8152492503795393))) as fillet2_piece_11_section:
        with BuildLine():
            CenterArc((25 + FILLET2_R, FILLET2_R), FILLET2_R, 180, 90)
            Line((25 + FILLET2_R, 0), (25, 0))
            Line((25, 0), (25, FILLET2_R))
        make_face()
    fillet2_piece_11 = revolve(axis=Axis((0, 10, 0), (0, 1, 0)), revolution_arc=289.224029318, mode=Mode.PRIVATE)
    fillet2_piece_11 = split(fillet2_piece_11, bisect_by=Plane(origin=(28.534533207, 14.552524817, -12.5), z_dir=(0, 0, 1)), keep=Keep.TOP, mode=Mode.PRIVATE)
    fillet2_piece_11 = split(fillet2_piece_11, bisect_by=Plane(origin=(28.534533207, 14.552524817, 12.5), z_dir=(0, 0, -1)), keep=Keep.TOP, mode=Mode.PRIVATE)
    add(fillet2_piece_11)
    with BuildSketch(Plane(origin=(0, 10, 0), x_dir=(-0.8152492503795393, 0, 0.5791102310921463), z_dir=(-0.5791102310921463, 0, -0.8152492503795393))) as fillet2_piece_12_section:
        with BuildLine():
            CenterArc((25 + FILLET2_R, FILLET2_R), FILLET2_R, 180, 90)
            Line((25 + FILLET2_R, 0), (25, 0))
            Line((25, 0), (25, FILLET2_R))
        make_face()
    fillet2_piece_12 = revolve(axis=Axis((0, 10, 0), (0, 1, 0)), revolution_arc=289.224029318, mode=Mode.PRIVATE)
    fillet2_piece_12 = split(fillet2_piece_12, bisect_by=Plane(origin=(-12.5, 14.552524817, -28.534533207), z_dir=(1, 0, 0)), keep=Keep.TOP, mode=Mode.PRIVATE)
    fillet2_piece_12 = split(fillet2_piece_12, bisect_by=Plane(origin=(-2.701e-06, 14.552524817, 12.5), z_dir=(0, 0, -1)), keep=Keep.TOP, mode=Mode.PRIVATE)
    fillet2_piece_12 = split(fillet2_piece_12, bisect_by=Plane(origin=(12.5, 14.552524817, -28.534533207), z_dir=(-1, 0, 0)), keep=Keep.TOP, mode=Mode.PRIVATE)
    add(fillet2_piece_12)


solid = part.part
